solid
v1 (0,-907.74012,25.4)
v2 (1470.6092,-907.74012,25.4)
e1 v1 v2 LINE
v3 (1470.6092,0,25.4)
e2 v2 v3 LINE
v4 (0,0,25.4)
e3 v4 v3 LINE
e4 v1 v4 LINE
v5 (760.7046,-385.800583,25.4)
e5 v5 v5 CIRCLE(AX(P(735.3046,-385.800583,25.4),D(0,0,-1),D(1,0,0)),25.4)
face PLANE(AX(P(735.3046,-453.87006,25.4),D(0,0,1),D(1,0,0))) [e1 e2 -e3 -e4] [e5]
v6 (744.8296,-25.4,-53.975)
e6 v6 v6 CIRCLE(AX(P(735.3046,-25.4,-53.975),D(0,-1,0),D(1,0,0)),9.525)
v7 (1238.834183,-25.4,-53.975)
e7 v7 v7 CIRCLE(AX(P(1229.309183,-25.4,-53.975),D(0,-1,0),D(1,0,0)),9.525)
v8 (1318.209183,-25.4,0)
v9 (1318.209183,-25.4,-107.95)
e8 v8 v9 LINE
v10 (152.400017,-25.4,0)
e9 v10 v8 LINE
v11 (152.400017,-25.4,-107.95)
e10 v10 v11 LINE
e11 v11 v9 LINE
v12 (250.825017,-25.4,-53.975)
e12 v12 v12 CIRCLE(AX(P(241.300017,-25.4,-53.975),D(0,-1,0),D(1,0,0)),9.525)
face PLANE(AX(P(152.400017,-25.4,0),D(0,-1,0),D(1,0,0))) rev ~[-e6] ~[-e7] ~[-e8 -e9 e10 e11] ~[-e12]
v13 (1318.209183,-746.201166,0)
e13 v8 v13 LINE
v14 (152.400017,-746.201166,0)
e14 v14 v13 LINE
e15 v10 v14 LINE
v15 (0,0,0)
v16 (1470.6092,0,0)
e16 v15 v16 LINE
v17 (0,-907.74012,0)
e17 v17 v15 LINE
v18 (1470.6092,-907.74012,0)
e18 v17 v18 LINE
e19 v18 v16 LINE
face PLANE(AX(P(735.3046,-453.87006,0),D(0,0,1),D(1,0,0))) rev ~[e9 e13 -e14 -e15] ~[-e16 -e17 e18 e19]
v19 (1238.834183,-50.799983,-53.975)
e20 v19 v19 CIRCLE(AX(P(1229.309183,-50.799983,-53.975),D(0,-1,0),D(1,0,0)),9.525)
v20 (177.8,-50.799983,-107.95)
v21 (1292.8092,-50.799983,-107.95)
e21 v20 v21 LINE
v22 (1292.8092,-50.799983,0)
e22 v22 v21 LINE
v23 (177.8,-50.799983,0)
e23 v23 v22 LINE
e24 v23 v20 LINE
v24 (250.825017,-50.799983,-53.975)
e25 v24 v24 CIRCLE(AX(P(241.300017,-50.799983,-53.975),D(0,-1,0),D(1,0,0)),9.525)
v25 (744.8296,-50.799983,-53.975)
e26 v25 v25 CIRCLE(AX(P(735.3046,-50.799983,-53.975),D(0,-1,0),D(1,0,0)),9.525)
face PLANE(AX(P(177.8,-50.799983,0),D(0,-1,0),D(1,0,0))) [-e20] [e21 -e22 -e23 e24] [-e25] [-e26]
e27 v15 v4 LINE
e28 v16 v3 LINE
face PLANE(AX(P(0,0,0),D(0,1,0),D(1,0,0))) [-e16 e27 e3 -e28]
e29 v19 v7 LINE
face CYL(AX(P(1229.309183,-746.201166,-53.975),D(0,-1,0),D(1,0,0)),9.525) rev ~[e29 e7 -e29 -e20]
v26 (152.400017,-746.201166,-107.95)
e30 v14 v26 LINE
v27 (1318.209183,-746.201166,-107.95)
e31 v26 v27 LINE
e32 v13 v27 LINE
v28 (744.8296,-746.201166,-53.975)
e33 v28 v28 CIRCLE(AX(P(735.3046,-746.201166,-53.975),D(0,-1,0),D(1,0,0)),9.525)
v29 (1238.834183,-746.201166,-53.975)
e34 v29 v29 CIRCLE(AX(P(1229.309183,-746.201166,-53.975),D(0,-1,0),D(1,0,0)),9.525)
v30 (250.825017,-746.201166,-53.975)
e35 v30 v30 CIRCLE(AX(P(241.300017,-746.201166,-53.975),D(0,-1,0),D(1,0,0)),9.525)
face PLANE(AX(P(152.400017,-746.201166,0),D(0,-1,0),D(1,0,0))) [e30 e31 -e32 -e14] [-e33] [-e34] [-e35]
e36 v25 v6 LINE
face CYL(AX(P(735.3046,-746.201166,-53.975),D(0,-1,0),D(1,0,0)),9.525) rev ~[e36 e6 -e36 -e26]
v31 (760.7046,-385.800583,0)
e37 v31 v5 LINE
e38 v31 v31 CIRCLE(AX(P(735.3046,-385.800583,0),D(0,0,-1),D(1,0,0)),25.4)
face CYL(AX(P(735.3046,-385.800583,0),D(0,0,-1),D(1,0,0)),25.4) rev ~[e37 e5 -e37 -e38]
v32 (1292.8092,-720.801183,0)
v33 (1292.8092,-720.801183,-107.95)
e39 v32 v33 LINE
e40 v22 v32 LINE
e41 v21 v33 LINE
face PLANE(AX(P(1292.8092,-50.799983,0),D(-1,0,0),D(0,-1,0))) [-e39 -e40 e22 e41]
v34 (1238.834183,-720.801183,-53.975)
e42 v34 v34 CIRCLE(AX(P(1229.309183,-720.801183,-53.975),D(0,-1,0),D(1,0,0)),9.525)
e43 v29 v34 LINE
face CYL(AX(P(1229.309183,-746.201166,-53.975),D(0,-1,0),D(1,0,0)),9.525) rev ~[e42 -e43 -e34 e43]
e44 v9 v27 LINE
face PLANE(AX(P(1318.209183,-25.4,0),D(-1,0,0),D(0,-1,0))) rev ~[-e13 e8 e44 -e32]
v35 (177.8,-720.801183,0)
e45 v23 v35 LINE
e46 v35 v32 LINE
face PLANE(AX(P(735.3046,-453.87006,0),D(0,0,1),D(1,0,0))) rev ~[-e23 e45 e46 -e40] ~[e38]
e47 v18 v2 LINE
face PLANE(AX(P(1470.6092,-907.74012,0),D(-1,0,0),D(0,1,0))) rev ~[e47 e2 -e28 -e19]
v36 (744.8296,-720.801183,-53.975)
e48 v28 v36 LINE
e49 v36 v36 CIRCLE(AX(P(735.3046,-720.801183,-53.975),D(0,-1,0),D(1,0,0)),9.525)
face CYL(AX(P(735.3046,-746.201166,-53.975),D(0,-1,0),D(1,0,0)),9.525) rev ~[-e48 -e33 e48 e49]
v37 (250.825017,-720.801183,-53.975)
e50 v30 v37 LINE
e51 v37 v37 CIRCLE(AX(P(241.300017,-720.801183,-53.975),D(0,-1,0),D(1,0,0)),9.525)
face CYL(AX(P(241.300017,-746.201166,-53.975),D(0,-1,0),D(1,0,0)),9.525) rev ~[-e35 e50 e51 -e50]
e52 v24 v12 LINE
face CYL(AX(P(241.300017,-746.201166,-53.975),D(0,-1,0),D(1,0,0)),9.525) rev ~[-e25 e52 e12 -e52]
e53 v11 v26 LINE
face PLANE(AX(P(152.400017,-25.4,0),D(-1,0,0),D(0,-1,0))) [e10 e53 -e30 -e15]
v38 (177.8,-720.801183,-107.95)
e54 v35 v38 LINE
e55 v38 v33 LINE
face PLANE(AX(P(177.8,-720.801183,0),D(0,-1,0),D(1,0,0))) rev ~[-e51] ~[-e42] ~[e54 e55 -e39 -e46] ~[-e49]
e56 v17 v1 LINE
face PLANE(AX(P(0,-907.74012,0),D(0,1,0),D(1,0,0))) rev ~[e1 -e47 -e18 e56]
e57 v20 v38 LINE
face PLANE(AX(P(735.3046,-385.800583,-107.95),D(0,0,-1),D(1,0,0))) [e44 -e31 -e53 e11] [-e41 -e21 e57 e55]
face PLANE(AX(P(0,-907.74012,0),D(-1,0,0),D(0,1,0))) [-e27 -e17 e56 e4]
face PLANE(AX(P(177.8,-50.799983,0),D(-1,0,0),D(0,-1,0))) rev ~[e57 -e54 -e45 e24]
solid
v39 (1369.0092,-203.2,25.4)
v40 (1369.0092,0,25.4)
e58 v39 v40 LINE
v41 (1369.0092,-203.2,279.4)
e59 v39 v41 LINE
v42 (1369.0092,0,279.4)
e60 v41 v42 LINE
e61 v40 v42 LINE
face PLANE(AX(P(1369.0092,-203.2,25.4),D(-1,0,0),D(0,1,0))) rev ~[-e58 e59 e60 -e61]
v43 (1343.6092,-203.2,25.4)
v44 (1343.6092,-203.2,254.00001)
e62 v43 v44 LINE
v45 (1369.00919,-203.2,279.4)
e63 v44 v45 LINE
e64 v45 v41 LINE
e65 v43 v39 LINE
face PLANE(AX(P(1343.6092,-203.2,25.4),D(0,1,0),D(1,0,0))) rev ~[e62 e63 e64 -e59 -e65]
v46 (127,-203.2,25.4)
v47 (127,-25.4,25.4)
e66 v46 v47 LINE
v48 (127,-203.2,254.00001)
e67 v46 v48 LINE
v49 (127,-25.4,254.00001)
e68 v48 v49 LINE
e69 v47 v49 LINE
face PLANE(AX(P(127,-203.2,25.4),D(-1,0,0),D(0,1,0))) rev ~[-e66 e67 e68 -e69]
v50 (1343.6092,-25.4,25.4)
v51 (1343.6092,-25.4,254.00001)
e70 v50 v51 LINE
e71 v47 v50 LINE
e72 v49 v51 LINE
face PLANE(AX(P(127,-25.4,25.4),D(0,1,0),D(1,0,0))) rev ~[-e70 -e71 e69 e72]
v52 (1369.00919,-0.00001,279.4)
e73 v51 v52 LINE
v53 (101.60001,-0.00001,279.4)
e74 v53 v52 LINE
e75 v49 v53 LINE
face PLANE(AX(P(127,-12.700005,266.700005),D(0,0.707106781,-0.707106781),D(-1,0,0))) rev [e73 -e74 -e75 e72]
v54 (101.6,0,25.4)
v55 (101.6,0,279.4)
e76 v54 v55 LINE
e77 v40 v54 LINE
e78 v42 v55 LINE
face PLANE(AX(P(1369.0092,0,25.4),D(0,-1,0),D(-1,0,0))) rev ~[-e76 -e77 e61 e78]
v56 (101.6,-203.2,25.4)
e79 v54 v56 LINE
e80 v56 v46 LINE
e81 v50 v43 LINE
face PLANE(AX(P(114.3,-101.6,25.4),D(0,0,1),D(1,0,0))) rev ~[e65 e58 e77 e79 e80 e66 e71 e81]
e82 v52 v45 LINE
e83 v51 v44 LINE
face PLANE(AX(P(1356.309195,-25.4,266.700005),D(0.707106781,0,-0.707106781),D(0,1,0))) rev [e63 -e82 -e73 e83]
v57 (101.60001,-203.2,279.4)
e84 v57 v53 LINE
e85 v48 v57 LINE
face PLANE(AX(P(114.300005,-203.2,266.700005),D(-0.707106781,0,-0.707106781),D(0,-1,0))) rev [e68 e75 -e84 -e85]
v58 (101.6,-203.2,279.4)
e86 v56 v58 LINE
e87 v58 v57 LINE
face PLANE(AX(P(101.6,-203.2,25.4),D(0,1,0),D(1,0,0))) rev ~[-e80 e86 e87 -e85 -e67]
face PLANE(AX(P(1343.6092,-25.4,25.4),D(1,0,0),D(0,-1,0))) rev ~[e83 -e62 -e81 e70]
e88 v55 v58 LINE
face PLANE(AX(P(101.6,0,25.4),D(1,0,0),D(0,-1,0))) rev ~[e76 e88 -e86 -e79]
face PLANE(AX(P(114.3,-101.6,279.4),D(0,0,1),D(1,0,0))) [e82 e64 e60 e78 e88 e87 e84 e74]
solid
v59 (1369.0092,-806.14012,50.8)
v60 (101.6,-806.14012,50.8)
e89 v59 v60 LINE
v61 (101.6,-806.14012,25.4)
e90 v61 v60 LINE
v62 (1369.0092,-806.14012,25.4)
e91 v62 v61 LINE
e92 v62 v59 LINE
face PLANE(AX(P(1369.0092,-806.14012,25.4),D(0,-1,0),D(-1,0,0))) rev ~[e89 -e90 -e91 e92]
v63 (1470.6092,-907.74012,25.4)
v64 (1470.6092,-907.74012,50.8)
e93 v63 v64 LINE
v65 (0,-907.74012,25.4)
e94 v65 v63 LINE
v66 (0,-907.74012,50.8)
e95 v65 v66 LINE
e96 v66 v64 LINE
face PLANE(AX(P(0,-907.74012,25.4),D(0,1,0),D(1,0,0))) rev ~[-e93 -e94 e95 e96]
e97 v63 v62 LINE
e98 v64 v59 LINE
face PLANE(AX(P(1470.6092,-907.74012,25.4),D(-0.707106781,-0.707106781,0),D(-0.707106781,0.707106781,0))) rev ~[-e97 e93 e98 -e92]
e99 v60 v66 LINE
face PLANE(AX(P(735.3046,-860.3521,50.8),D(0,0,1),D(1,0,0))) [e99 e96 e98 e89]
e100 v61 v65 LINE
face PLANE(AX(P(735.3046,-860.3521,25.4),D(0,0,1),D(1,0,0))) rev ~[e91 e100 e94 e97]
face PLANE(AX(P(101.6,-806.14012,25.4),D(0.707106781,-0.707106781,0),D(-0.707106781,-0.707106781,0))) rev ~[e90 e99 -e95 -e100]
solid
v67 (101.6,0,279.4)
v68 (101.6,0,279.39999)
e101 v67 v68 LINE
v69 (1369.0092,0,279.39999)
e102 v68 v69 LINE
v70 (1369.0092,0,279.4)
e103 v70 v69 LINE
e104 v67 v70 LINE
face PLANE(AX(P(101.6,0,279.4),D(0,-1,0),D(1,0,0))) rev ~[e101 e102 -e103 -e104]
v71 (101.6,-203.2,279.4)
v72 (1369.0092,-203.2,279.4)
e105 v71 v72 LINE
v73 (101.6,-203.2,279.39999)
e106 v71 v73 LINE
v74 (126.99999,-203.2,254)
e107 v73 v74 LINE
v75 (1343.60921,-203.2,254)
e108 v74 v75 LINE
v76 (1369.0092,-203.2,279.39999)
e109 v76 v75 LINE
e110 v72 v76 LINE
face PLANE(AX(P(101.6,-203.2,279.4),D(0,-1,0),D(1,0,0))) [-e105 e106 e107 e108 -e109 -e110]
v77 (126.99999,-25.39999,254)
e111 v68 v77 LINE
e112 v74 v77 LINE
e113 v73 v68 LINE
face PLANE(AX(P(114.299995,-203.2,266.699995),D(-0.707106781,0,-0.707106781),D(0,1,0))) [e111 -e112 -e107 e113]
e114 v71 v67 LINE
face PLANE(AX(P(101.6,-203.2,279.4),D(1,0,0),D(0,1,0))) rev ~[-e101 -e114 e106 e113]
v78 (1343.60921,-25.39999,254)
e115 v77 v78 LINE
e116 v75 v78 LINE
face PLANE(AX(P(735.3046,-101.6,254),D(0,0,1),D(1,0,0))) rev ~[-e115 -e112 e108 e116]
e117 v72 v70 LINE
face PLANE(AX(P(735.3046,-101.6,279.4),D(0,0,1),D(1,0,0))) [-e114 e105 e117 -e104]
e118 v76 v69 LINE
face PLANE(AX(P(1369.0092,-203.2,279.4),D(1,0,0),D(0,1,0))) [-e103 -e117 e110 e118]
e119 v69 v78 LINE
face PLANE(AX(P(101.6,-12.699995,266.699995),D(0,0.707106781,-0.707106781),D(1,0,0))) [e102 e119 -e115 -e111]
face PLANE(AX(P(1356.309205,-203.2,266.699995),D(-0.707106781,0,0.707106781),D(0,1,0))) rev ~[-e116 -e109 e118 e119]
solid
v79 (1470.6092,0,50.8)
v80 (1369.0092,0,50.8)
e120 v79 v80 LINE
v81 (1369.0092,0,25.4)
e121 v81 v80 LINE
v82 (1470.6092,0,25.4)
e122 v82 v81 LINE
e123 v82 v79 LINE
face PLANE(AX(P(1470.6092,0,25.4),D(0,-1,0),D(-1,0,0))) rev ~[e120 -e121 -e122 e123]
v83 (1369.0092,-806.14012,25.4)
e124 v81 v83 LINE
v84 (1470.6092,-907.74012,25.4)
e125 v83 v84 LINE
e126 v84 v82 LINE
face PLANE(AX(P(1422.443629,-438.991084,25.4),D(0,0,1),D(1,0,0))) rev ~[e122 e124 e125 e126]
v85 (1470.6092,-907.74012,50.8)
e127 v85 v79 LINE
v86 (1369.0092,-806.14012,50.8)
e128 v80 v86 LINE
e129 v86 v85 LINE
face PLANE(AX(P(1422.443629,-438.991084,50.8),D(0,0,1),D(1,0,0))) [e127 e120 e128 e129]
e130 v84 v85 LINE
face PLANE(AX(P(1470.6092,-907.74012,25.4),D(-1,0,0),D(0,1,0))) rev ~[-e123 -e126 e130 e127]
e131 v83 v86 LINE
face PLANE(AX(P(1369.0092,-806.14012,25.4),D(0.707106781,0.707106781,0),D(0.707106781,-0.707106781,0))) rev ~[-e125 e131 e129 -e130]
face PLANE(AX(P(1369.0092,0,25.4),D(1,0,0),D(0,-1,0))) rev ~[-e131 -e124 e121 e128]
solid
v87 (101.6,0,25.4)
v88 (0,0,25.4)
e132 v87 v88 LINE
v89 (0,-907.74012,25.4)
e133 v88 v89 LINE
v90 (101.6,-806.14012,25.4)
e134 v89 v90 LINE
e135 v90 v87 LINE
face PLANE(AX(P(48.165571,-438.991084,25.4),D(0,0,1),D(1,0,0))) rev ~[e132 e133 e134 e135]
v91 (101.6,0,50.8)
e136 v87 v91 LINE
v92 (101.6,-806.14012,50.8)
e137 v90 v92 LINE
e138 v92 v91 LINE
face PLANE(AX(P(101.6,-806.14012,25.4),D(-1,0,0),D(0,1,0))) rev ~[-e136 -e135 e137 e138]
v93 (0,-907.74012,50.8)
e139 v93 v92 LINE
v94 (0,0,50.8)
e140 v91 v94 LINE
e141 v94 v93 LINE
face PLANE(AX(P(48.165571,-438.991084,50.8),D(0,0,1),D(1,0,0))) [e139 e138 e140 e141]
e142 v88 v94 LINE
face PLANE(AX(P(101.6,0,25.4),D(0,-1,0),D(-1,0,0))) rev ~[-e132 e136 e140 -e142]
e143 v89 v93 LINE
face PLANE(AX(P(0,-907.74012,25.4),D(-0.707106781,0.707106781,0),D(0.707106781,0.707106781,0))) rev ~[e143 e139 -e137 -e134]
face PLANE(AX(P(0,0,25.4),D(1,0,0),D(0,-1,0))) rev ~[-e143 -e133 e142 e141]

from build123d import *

# Parameters (mm, degrees)
F0_W      = 1470.6092
F0_H      = 907.74012
F1_DEPTH  = 25.4
F2_W      = 1165.8091658585
F2_H      = 720.8011658585
F2_W_2    = 1115.0092
F2_H_2    = 670.0012
F3_DEPTH  = 107.95
F4_R      = 25.4
F5_DEPTH  = 25.4
F6_R      = 9.525
F7_DEPTH  = 720.8011658585
F9_DEPTH  = 25.4
F10_DEPTH = 25.4
F11_DEPTH = 25.4
F12_W     = 1216.6092
F12_H     = 25.4
F13_DEPTH = 254
F14_SIZE  = 25.39999
F16_W     = 1267.4092
F16_H     = 203.2
F17_DEPTH = 25.4
F18_SIZE  = 25.39999


# Not quite as in the source:
# - a fillet or chamfer is up to 0.001 mm smaller than in the source, because OpenCascade refuses the exact size


with BuildPart() as f1:
    # F0 (on Top) → F1 (new body)
    with BuildSketch(Plane.XY):
        with Locations((735.3046, -453.87006)):
            Rectangle(F0_W, F0_H)
    extrude(amount=F1_DEPTH)

    # F2 (on face) → F3 (join)
    with BuildSketch(Plane(origin=(0, 0, 0), x_dir=(1, 0, 0), z_dir=(0, 0, -1))):
        with Locations((735.3046, 385.8005829292)):
            Rectangle(F2_W, F2_H)
        with Locations((735.3046, 385.8005829292)):
            Rectangle(F2_W_2, F2_H_2, mode=Mode.SUBTRACT)
    extrude(amount=F3_DEPTH)

    # F4 (on face) → F5 (cut, through all)
    with BuildSketch(Plane(origin=(0, 0, 0), x_dir=(1, 0, 0), z_dir=(0, 0, -1))):
        with Locations((735.3046, 385.8005829292)):
            Circle(F4_R)
    extrude(amount=-F5_DEPTH, mode=Mode.SUBTRACT)

    # F6 (on face) → F7 (cut, through all)
    with BuildSketch(Plane.XZ.offset(746.2011658585)):
        with Locations((735.3046, -53.975)):
            Circle(F6_R)
        with Locations((241.3000170708, -53.975)):
            Circle(F6_R)
        with Locations((1229.3091829292, -53.975)):
            Circle(F6_R)
    extrude(amount=-F7_DEPTH, mode=Mode.SUBTRACT)


with BuildPart() as f9:
    # F8 (on face) → F9 (new body)
    with BuildSketch(Plane.XY.offset(25.4)):
        Polygon((101.6, 0), (0, 0), (0, -907.74012), (101.6, -806.14012), align=None)
    extrude(amount=F9_DEPTH)


with BuildPart() as f10:
    # F8 (on face) → F10 (new body)
    with BuildSketch(Plane.XY.offset(25.4)):
        Polygon((101.6, -806.14012), (0, -907.74012), (1470.6092, -907.74012), (1369.0092, -806.14012), align=None)
    extrude(amount=F10_DEPTH)


with BuildPart() as f11:
    # F8 (on face) → F11 (new body)
    with BuildSketch(Plane.XY.offset(25.4)):
        Polygon((1369.0092, -806.14012), (1470.6092, -907.74012), (1470.6092, 0), (1369.0092, 0), align=None)
    extrude(amount=F11_DEPTH)


with BuildPart() as f13:
    # F12 (on face) → F13 (new body)
    with BuildSketch(Plane.XY.offset(25.4)):
        Polygon((127, 0), (101.6, 0), (101.6, -203.2), (127, -203.2), (127, -25.4), align=None)
        with Locations((735.3046, -12.7)):
            Rectangle(F12_W, F12_H)
        Polygon((1369.0092, 0), (1343.6092, 0), (1343.6092, -25.4), (1343.6092, -203.2), (1369.0092, -203.2), align=None)
    extrude(amount=F13_DEPTH)

    # F14 (size 25.4 in the source; OpenCascade refuses exactly that, so slightly less here)
    f14_edges = [f13.edges().sort_by_distance(p)[0] for p in [
        (735.3046, -25.4, 279.4),
        (127, -114.3, 279.4),
        (1343.6092, -114.3, 279.4),
    ]]
    chamfer(f14_edges, length=F14_SIZE)


with BuildPart() as f17:
    # F16 (on face) → F17 (new body)
    with BuildSketch(Plane.XY.offset(279.4)):
        with Locations((735.3046, -101.6)):
            Rectangle(F16_W, F16_H)
    extrude(amount=-F17_DEPTH)

    # F18 (size 25.4 in the source; OpenCascade refuses exactly that, so slightly less here)
    f18_edges = [f17.edges().sort_by_distance(p)[0] for p in [
        (101.6, -101.6, 254),
        (735.3046, 0, 254),
        (1369.0092, -101.6, 254),
    ]]
    chamfer(f18_edges, length=F18_SIZE)


solid = Compound([f1.part, f9.part, f10.part, f11.part, f13.part, f17.part])
